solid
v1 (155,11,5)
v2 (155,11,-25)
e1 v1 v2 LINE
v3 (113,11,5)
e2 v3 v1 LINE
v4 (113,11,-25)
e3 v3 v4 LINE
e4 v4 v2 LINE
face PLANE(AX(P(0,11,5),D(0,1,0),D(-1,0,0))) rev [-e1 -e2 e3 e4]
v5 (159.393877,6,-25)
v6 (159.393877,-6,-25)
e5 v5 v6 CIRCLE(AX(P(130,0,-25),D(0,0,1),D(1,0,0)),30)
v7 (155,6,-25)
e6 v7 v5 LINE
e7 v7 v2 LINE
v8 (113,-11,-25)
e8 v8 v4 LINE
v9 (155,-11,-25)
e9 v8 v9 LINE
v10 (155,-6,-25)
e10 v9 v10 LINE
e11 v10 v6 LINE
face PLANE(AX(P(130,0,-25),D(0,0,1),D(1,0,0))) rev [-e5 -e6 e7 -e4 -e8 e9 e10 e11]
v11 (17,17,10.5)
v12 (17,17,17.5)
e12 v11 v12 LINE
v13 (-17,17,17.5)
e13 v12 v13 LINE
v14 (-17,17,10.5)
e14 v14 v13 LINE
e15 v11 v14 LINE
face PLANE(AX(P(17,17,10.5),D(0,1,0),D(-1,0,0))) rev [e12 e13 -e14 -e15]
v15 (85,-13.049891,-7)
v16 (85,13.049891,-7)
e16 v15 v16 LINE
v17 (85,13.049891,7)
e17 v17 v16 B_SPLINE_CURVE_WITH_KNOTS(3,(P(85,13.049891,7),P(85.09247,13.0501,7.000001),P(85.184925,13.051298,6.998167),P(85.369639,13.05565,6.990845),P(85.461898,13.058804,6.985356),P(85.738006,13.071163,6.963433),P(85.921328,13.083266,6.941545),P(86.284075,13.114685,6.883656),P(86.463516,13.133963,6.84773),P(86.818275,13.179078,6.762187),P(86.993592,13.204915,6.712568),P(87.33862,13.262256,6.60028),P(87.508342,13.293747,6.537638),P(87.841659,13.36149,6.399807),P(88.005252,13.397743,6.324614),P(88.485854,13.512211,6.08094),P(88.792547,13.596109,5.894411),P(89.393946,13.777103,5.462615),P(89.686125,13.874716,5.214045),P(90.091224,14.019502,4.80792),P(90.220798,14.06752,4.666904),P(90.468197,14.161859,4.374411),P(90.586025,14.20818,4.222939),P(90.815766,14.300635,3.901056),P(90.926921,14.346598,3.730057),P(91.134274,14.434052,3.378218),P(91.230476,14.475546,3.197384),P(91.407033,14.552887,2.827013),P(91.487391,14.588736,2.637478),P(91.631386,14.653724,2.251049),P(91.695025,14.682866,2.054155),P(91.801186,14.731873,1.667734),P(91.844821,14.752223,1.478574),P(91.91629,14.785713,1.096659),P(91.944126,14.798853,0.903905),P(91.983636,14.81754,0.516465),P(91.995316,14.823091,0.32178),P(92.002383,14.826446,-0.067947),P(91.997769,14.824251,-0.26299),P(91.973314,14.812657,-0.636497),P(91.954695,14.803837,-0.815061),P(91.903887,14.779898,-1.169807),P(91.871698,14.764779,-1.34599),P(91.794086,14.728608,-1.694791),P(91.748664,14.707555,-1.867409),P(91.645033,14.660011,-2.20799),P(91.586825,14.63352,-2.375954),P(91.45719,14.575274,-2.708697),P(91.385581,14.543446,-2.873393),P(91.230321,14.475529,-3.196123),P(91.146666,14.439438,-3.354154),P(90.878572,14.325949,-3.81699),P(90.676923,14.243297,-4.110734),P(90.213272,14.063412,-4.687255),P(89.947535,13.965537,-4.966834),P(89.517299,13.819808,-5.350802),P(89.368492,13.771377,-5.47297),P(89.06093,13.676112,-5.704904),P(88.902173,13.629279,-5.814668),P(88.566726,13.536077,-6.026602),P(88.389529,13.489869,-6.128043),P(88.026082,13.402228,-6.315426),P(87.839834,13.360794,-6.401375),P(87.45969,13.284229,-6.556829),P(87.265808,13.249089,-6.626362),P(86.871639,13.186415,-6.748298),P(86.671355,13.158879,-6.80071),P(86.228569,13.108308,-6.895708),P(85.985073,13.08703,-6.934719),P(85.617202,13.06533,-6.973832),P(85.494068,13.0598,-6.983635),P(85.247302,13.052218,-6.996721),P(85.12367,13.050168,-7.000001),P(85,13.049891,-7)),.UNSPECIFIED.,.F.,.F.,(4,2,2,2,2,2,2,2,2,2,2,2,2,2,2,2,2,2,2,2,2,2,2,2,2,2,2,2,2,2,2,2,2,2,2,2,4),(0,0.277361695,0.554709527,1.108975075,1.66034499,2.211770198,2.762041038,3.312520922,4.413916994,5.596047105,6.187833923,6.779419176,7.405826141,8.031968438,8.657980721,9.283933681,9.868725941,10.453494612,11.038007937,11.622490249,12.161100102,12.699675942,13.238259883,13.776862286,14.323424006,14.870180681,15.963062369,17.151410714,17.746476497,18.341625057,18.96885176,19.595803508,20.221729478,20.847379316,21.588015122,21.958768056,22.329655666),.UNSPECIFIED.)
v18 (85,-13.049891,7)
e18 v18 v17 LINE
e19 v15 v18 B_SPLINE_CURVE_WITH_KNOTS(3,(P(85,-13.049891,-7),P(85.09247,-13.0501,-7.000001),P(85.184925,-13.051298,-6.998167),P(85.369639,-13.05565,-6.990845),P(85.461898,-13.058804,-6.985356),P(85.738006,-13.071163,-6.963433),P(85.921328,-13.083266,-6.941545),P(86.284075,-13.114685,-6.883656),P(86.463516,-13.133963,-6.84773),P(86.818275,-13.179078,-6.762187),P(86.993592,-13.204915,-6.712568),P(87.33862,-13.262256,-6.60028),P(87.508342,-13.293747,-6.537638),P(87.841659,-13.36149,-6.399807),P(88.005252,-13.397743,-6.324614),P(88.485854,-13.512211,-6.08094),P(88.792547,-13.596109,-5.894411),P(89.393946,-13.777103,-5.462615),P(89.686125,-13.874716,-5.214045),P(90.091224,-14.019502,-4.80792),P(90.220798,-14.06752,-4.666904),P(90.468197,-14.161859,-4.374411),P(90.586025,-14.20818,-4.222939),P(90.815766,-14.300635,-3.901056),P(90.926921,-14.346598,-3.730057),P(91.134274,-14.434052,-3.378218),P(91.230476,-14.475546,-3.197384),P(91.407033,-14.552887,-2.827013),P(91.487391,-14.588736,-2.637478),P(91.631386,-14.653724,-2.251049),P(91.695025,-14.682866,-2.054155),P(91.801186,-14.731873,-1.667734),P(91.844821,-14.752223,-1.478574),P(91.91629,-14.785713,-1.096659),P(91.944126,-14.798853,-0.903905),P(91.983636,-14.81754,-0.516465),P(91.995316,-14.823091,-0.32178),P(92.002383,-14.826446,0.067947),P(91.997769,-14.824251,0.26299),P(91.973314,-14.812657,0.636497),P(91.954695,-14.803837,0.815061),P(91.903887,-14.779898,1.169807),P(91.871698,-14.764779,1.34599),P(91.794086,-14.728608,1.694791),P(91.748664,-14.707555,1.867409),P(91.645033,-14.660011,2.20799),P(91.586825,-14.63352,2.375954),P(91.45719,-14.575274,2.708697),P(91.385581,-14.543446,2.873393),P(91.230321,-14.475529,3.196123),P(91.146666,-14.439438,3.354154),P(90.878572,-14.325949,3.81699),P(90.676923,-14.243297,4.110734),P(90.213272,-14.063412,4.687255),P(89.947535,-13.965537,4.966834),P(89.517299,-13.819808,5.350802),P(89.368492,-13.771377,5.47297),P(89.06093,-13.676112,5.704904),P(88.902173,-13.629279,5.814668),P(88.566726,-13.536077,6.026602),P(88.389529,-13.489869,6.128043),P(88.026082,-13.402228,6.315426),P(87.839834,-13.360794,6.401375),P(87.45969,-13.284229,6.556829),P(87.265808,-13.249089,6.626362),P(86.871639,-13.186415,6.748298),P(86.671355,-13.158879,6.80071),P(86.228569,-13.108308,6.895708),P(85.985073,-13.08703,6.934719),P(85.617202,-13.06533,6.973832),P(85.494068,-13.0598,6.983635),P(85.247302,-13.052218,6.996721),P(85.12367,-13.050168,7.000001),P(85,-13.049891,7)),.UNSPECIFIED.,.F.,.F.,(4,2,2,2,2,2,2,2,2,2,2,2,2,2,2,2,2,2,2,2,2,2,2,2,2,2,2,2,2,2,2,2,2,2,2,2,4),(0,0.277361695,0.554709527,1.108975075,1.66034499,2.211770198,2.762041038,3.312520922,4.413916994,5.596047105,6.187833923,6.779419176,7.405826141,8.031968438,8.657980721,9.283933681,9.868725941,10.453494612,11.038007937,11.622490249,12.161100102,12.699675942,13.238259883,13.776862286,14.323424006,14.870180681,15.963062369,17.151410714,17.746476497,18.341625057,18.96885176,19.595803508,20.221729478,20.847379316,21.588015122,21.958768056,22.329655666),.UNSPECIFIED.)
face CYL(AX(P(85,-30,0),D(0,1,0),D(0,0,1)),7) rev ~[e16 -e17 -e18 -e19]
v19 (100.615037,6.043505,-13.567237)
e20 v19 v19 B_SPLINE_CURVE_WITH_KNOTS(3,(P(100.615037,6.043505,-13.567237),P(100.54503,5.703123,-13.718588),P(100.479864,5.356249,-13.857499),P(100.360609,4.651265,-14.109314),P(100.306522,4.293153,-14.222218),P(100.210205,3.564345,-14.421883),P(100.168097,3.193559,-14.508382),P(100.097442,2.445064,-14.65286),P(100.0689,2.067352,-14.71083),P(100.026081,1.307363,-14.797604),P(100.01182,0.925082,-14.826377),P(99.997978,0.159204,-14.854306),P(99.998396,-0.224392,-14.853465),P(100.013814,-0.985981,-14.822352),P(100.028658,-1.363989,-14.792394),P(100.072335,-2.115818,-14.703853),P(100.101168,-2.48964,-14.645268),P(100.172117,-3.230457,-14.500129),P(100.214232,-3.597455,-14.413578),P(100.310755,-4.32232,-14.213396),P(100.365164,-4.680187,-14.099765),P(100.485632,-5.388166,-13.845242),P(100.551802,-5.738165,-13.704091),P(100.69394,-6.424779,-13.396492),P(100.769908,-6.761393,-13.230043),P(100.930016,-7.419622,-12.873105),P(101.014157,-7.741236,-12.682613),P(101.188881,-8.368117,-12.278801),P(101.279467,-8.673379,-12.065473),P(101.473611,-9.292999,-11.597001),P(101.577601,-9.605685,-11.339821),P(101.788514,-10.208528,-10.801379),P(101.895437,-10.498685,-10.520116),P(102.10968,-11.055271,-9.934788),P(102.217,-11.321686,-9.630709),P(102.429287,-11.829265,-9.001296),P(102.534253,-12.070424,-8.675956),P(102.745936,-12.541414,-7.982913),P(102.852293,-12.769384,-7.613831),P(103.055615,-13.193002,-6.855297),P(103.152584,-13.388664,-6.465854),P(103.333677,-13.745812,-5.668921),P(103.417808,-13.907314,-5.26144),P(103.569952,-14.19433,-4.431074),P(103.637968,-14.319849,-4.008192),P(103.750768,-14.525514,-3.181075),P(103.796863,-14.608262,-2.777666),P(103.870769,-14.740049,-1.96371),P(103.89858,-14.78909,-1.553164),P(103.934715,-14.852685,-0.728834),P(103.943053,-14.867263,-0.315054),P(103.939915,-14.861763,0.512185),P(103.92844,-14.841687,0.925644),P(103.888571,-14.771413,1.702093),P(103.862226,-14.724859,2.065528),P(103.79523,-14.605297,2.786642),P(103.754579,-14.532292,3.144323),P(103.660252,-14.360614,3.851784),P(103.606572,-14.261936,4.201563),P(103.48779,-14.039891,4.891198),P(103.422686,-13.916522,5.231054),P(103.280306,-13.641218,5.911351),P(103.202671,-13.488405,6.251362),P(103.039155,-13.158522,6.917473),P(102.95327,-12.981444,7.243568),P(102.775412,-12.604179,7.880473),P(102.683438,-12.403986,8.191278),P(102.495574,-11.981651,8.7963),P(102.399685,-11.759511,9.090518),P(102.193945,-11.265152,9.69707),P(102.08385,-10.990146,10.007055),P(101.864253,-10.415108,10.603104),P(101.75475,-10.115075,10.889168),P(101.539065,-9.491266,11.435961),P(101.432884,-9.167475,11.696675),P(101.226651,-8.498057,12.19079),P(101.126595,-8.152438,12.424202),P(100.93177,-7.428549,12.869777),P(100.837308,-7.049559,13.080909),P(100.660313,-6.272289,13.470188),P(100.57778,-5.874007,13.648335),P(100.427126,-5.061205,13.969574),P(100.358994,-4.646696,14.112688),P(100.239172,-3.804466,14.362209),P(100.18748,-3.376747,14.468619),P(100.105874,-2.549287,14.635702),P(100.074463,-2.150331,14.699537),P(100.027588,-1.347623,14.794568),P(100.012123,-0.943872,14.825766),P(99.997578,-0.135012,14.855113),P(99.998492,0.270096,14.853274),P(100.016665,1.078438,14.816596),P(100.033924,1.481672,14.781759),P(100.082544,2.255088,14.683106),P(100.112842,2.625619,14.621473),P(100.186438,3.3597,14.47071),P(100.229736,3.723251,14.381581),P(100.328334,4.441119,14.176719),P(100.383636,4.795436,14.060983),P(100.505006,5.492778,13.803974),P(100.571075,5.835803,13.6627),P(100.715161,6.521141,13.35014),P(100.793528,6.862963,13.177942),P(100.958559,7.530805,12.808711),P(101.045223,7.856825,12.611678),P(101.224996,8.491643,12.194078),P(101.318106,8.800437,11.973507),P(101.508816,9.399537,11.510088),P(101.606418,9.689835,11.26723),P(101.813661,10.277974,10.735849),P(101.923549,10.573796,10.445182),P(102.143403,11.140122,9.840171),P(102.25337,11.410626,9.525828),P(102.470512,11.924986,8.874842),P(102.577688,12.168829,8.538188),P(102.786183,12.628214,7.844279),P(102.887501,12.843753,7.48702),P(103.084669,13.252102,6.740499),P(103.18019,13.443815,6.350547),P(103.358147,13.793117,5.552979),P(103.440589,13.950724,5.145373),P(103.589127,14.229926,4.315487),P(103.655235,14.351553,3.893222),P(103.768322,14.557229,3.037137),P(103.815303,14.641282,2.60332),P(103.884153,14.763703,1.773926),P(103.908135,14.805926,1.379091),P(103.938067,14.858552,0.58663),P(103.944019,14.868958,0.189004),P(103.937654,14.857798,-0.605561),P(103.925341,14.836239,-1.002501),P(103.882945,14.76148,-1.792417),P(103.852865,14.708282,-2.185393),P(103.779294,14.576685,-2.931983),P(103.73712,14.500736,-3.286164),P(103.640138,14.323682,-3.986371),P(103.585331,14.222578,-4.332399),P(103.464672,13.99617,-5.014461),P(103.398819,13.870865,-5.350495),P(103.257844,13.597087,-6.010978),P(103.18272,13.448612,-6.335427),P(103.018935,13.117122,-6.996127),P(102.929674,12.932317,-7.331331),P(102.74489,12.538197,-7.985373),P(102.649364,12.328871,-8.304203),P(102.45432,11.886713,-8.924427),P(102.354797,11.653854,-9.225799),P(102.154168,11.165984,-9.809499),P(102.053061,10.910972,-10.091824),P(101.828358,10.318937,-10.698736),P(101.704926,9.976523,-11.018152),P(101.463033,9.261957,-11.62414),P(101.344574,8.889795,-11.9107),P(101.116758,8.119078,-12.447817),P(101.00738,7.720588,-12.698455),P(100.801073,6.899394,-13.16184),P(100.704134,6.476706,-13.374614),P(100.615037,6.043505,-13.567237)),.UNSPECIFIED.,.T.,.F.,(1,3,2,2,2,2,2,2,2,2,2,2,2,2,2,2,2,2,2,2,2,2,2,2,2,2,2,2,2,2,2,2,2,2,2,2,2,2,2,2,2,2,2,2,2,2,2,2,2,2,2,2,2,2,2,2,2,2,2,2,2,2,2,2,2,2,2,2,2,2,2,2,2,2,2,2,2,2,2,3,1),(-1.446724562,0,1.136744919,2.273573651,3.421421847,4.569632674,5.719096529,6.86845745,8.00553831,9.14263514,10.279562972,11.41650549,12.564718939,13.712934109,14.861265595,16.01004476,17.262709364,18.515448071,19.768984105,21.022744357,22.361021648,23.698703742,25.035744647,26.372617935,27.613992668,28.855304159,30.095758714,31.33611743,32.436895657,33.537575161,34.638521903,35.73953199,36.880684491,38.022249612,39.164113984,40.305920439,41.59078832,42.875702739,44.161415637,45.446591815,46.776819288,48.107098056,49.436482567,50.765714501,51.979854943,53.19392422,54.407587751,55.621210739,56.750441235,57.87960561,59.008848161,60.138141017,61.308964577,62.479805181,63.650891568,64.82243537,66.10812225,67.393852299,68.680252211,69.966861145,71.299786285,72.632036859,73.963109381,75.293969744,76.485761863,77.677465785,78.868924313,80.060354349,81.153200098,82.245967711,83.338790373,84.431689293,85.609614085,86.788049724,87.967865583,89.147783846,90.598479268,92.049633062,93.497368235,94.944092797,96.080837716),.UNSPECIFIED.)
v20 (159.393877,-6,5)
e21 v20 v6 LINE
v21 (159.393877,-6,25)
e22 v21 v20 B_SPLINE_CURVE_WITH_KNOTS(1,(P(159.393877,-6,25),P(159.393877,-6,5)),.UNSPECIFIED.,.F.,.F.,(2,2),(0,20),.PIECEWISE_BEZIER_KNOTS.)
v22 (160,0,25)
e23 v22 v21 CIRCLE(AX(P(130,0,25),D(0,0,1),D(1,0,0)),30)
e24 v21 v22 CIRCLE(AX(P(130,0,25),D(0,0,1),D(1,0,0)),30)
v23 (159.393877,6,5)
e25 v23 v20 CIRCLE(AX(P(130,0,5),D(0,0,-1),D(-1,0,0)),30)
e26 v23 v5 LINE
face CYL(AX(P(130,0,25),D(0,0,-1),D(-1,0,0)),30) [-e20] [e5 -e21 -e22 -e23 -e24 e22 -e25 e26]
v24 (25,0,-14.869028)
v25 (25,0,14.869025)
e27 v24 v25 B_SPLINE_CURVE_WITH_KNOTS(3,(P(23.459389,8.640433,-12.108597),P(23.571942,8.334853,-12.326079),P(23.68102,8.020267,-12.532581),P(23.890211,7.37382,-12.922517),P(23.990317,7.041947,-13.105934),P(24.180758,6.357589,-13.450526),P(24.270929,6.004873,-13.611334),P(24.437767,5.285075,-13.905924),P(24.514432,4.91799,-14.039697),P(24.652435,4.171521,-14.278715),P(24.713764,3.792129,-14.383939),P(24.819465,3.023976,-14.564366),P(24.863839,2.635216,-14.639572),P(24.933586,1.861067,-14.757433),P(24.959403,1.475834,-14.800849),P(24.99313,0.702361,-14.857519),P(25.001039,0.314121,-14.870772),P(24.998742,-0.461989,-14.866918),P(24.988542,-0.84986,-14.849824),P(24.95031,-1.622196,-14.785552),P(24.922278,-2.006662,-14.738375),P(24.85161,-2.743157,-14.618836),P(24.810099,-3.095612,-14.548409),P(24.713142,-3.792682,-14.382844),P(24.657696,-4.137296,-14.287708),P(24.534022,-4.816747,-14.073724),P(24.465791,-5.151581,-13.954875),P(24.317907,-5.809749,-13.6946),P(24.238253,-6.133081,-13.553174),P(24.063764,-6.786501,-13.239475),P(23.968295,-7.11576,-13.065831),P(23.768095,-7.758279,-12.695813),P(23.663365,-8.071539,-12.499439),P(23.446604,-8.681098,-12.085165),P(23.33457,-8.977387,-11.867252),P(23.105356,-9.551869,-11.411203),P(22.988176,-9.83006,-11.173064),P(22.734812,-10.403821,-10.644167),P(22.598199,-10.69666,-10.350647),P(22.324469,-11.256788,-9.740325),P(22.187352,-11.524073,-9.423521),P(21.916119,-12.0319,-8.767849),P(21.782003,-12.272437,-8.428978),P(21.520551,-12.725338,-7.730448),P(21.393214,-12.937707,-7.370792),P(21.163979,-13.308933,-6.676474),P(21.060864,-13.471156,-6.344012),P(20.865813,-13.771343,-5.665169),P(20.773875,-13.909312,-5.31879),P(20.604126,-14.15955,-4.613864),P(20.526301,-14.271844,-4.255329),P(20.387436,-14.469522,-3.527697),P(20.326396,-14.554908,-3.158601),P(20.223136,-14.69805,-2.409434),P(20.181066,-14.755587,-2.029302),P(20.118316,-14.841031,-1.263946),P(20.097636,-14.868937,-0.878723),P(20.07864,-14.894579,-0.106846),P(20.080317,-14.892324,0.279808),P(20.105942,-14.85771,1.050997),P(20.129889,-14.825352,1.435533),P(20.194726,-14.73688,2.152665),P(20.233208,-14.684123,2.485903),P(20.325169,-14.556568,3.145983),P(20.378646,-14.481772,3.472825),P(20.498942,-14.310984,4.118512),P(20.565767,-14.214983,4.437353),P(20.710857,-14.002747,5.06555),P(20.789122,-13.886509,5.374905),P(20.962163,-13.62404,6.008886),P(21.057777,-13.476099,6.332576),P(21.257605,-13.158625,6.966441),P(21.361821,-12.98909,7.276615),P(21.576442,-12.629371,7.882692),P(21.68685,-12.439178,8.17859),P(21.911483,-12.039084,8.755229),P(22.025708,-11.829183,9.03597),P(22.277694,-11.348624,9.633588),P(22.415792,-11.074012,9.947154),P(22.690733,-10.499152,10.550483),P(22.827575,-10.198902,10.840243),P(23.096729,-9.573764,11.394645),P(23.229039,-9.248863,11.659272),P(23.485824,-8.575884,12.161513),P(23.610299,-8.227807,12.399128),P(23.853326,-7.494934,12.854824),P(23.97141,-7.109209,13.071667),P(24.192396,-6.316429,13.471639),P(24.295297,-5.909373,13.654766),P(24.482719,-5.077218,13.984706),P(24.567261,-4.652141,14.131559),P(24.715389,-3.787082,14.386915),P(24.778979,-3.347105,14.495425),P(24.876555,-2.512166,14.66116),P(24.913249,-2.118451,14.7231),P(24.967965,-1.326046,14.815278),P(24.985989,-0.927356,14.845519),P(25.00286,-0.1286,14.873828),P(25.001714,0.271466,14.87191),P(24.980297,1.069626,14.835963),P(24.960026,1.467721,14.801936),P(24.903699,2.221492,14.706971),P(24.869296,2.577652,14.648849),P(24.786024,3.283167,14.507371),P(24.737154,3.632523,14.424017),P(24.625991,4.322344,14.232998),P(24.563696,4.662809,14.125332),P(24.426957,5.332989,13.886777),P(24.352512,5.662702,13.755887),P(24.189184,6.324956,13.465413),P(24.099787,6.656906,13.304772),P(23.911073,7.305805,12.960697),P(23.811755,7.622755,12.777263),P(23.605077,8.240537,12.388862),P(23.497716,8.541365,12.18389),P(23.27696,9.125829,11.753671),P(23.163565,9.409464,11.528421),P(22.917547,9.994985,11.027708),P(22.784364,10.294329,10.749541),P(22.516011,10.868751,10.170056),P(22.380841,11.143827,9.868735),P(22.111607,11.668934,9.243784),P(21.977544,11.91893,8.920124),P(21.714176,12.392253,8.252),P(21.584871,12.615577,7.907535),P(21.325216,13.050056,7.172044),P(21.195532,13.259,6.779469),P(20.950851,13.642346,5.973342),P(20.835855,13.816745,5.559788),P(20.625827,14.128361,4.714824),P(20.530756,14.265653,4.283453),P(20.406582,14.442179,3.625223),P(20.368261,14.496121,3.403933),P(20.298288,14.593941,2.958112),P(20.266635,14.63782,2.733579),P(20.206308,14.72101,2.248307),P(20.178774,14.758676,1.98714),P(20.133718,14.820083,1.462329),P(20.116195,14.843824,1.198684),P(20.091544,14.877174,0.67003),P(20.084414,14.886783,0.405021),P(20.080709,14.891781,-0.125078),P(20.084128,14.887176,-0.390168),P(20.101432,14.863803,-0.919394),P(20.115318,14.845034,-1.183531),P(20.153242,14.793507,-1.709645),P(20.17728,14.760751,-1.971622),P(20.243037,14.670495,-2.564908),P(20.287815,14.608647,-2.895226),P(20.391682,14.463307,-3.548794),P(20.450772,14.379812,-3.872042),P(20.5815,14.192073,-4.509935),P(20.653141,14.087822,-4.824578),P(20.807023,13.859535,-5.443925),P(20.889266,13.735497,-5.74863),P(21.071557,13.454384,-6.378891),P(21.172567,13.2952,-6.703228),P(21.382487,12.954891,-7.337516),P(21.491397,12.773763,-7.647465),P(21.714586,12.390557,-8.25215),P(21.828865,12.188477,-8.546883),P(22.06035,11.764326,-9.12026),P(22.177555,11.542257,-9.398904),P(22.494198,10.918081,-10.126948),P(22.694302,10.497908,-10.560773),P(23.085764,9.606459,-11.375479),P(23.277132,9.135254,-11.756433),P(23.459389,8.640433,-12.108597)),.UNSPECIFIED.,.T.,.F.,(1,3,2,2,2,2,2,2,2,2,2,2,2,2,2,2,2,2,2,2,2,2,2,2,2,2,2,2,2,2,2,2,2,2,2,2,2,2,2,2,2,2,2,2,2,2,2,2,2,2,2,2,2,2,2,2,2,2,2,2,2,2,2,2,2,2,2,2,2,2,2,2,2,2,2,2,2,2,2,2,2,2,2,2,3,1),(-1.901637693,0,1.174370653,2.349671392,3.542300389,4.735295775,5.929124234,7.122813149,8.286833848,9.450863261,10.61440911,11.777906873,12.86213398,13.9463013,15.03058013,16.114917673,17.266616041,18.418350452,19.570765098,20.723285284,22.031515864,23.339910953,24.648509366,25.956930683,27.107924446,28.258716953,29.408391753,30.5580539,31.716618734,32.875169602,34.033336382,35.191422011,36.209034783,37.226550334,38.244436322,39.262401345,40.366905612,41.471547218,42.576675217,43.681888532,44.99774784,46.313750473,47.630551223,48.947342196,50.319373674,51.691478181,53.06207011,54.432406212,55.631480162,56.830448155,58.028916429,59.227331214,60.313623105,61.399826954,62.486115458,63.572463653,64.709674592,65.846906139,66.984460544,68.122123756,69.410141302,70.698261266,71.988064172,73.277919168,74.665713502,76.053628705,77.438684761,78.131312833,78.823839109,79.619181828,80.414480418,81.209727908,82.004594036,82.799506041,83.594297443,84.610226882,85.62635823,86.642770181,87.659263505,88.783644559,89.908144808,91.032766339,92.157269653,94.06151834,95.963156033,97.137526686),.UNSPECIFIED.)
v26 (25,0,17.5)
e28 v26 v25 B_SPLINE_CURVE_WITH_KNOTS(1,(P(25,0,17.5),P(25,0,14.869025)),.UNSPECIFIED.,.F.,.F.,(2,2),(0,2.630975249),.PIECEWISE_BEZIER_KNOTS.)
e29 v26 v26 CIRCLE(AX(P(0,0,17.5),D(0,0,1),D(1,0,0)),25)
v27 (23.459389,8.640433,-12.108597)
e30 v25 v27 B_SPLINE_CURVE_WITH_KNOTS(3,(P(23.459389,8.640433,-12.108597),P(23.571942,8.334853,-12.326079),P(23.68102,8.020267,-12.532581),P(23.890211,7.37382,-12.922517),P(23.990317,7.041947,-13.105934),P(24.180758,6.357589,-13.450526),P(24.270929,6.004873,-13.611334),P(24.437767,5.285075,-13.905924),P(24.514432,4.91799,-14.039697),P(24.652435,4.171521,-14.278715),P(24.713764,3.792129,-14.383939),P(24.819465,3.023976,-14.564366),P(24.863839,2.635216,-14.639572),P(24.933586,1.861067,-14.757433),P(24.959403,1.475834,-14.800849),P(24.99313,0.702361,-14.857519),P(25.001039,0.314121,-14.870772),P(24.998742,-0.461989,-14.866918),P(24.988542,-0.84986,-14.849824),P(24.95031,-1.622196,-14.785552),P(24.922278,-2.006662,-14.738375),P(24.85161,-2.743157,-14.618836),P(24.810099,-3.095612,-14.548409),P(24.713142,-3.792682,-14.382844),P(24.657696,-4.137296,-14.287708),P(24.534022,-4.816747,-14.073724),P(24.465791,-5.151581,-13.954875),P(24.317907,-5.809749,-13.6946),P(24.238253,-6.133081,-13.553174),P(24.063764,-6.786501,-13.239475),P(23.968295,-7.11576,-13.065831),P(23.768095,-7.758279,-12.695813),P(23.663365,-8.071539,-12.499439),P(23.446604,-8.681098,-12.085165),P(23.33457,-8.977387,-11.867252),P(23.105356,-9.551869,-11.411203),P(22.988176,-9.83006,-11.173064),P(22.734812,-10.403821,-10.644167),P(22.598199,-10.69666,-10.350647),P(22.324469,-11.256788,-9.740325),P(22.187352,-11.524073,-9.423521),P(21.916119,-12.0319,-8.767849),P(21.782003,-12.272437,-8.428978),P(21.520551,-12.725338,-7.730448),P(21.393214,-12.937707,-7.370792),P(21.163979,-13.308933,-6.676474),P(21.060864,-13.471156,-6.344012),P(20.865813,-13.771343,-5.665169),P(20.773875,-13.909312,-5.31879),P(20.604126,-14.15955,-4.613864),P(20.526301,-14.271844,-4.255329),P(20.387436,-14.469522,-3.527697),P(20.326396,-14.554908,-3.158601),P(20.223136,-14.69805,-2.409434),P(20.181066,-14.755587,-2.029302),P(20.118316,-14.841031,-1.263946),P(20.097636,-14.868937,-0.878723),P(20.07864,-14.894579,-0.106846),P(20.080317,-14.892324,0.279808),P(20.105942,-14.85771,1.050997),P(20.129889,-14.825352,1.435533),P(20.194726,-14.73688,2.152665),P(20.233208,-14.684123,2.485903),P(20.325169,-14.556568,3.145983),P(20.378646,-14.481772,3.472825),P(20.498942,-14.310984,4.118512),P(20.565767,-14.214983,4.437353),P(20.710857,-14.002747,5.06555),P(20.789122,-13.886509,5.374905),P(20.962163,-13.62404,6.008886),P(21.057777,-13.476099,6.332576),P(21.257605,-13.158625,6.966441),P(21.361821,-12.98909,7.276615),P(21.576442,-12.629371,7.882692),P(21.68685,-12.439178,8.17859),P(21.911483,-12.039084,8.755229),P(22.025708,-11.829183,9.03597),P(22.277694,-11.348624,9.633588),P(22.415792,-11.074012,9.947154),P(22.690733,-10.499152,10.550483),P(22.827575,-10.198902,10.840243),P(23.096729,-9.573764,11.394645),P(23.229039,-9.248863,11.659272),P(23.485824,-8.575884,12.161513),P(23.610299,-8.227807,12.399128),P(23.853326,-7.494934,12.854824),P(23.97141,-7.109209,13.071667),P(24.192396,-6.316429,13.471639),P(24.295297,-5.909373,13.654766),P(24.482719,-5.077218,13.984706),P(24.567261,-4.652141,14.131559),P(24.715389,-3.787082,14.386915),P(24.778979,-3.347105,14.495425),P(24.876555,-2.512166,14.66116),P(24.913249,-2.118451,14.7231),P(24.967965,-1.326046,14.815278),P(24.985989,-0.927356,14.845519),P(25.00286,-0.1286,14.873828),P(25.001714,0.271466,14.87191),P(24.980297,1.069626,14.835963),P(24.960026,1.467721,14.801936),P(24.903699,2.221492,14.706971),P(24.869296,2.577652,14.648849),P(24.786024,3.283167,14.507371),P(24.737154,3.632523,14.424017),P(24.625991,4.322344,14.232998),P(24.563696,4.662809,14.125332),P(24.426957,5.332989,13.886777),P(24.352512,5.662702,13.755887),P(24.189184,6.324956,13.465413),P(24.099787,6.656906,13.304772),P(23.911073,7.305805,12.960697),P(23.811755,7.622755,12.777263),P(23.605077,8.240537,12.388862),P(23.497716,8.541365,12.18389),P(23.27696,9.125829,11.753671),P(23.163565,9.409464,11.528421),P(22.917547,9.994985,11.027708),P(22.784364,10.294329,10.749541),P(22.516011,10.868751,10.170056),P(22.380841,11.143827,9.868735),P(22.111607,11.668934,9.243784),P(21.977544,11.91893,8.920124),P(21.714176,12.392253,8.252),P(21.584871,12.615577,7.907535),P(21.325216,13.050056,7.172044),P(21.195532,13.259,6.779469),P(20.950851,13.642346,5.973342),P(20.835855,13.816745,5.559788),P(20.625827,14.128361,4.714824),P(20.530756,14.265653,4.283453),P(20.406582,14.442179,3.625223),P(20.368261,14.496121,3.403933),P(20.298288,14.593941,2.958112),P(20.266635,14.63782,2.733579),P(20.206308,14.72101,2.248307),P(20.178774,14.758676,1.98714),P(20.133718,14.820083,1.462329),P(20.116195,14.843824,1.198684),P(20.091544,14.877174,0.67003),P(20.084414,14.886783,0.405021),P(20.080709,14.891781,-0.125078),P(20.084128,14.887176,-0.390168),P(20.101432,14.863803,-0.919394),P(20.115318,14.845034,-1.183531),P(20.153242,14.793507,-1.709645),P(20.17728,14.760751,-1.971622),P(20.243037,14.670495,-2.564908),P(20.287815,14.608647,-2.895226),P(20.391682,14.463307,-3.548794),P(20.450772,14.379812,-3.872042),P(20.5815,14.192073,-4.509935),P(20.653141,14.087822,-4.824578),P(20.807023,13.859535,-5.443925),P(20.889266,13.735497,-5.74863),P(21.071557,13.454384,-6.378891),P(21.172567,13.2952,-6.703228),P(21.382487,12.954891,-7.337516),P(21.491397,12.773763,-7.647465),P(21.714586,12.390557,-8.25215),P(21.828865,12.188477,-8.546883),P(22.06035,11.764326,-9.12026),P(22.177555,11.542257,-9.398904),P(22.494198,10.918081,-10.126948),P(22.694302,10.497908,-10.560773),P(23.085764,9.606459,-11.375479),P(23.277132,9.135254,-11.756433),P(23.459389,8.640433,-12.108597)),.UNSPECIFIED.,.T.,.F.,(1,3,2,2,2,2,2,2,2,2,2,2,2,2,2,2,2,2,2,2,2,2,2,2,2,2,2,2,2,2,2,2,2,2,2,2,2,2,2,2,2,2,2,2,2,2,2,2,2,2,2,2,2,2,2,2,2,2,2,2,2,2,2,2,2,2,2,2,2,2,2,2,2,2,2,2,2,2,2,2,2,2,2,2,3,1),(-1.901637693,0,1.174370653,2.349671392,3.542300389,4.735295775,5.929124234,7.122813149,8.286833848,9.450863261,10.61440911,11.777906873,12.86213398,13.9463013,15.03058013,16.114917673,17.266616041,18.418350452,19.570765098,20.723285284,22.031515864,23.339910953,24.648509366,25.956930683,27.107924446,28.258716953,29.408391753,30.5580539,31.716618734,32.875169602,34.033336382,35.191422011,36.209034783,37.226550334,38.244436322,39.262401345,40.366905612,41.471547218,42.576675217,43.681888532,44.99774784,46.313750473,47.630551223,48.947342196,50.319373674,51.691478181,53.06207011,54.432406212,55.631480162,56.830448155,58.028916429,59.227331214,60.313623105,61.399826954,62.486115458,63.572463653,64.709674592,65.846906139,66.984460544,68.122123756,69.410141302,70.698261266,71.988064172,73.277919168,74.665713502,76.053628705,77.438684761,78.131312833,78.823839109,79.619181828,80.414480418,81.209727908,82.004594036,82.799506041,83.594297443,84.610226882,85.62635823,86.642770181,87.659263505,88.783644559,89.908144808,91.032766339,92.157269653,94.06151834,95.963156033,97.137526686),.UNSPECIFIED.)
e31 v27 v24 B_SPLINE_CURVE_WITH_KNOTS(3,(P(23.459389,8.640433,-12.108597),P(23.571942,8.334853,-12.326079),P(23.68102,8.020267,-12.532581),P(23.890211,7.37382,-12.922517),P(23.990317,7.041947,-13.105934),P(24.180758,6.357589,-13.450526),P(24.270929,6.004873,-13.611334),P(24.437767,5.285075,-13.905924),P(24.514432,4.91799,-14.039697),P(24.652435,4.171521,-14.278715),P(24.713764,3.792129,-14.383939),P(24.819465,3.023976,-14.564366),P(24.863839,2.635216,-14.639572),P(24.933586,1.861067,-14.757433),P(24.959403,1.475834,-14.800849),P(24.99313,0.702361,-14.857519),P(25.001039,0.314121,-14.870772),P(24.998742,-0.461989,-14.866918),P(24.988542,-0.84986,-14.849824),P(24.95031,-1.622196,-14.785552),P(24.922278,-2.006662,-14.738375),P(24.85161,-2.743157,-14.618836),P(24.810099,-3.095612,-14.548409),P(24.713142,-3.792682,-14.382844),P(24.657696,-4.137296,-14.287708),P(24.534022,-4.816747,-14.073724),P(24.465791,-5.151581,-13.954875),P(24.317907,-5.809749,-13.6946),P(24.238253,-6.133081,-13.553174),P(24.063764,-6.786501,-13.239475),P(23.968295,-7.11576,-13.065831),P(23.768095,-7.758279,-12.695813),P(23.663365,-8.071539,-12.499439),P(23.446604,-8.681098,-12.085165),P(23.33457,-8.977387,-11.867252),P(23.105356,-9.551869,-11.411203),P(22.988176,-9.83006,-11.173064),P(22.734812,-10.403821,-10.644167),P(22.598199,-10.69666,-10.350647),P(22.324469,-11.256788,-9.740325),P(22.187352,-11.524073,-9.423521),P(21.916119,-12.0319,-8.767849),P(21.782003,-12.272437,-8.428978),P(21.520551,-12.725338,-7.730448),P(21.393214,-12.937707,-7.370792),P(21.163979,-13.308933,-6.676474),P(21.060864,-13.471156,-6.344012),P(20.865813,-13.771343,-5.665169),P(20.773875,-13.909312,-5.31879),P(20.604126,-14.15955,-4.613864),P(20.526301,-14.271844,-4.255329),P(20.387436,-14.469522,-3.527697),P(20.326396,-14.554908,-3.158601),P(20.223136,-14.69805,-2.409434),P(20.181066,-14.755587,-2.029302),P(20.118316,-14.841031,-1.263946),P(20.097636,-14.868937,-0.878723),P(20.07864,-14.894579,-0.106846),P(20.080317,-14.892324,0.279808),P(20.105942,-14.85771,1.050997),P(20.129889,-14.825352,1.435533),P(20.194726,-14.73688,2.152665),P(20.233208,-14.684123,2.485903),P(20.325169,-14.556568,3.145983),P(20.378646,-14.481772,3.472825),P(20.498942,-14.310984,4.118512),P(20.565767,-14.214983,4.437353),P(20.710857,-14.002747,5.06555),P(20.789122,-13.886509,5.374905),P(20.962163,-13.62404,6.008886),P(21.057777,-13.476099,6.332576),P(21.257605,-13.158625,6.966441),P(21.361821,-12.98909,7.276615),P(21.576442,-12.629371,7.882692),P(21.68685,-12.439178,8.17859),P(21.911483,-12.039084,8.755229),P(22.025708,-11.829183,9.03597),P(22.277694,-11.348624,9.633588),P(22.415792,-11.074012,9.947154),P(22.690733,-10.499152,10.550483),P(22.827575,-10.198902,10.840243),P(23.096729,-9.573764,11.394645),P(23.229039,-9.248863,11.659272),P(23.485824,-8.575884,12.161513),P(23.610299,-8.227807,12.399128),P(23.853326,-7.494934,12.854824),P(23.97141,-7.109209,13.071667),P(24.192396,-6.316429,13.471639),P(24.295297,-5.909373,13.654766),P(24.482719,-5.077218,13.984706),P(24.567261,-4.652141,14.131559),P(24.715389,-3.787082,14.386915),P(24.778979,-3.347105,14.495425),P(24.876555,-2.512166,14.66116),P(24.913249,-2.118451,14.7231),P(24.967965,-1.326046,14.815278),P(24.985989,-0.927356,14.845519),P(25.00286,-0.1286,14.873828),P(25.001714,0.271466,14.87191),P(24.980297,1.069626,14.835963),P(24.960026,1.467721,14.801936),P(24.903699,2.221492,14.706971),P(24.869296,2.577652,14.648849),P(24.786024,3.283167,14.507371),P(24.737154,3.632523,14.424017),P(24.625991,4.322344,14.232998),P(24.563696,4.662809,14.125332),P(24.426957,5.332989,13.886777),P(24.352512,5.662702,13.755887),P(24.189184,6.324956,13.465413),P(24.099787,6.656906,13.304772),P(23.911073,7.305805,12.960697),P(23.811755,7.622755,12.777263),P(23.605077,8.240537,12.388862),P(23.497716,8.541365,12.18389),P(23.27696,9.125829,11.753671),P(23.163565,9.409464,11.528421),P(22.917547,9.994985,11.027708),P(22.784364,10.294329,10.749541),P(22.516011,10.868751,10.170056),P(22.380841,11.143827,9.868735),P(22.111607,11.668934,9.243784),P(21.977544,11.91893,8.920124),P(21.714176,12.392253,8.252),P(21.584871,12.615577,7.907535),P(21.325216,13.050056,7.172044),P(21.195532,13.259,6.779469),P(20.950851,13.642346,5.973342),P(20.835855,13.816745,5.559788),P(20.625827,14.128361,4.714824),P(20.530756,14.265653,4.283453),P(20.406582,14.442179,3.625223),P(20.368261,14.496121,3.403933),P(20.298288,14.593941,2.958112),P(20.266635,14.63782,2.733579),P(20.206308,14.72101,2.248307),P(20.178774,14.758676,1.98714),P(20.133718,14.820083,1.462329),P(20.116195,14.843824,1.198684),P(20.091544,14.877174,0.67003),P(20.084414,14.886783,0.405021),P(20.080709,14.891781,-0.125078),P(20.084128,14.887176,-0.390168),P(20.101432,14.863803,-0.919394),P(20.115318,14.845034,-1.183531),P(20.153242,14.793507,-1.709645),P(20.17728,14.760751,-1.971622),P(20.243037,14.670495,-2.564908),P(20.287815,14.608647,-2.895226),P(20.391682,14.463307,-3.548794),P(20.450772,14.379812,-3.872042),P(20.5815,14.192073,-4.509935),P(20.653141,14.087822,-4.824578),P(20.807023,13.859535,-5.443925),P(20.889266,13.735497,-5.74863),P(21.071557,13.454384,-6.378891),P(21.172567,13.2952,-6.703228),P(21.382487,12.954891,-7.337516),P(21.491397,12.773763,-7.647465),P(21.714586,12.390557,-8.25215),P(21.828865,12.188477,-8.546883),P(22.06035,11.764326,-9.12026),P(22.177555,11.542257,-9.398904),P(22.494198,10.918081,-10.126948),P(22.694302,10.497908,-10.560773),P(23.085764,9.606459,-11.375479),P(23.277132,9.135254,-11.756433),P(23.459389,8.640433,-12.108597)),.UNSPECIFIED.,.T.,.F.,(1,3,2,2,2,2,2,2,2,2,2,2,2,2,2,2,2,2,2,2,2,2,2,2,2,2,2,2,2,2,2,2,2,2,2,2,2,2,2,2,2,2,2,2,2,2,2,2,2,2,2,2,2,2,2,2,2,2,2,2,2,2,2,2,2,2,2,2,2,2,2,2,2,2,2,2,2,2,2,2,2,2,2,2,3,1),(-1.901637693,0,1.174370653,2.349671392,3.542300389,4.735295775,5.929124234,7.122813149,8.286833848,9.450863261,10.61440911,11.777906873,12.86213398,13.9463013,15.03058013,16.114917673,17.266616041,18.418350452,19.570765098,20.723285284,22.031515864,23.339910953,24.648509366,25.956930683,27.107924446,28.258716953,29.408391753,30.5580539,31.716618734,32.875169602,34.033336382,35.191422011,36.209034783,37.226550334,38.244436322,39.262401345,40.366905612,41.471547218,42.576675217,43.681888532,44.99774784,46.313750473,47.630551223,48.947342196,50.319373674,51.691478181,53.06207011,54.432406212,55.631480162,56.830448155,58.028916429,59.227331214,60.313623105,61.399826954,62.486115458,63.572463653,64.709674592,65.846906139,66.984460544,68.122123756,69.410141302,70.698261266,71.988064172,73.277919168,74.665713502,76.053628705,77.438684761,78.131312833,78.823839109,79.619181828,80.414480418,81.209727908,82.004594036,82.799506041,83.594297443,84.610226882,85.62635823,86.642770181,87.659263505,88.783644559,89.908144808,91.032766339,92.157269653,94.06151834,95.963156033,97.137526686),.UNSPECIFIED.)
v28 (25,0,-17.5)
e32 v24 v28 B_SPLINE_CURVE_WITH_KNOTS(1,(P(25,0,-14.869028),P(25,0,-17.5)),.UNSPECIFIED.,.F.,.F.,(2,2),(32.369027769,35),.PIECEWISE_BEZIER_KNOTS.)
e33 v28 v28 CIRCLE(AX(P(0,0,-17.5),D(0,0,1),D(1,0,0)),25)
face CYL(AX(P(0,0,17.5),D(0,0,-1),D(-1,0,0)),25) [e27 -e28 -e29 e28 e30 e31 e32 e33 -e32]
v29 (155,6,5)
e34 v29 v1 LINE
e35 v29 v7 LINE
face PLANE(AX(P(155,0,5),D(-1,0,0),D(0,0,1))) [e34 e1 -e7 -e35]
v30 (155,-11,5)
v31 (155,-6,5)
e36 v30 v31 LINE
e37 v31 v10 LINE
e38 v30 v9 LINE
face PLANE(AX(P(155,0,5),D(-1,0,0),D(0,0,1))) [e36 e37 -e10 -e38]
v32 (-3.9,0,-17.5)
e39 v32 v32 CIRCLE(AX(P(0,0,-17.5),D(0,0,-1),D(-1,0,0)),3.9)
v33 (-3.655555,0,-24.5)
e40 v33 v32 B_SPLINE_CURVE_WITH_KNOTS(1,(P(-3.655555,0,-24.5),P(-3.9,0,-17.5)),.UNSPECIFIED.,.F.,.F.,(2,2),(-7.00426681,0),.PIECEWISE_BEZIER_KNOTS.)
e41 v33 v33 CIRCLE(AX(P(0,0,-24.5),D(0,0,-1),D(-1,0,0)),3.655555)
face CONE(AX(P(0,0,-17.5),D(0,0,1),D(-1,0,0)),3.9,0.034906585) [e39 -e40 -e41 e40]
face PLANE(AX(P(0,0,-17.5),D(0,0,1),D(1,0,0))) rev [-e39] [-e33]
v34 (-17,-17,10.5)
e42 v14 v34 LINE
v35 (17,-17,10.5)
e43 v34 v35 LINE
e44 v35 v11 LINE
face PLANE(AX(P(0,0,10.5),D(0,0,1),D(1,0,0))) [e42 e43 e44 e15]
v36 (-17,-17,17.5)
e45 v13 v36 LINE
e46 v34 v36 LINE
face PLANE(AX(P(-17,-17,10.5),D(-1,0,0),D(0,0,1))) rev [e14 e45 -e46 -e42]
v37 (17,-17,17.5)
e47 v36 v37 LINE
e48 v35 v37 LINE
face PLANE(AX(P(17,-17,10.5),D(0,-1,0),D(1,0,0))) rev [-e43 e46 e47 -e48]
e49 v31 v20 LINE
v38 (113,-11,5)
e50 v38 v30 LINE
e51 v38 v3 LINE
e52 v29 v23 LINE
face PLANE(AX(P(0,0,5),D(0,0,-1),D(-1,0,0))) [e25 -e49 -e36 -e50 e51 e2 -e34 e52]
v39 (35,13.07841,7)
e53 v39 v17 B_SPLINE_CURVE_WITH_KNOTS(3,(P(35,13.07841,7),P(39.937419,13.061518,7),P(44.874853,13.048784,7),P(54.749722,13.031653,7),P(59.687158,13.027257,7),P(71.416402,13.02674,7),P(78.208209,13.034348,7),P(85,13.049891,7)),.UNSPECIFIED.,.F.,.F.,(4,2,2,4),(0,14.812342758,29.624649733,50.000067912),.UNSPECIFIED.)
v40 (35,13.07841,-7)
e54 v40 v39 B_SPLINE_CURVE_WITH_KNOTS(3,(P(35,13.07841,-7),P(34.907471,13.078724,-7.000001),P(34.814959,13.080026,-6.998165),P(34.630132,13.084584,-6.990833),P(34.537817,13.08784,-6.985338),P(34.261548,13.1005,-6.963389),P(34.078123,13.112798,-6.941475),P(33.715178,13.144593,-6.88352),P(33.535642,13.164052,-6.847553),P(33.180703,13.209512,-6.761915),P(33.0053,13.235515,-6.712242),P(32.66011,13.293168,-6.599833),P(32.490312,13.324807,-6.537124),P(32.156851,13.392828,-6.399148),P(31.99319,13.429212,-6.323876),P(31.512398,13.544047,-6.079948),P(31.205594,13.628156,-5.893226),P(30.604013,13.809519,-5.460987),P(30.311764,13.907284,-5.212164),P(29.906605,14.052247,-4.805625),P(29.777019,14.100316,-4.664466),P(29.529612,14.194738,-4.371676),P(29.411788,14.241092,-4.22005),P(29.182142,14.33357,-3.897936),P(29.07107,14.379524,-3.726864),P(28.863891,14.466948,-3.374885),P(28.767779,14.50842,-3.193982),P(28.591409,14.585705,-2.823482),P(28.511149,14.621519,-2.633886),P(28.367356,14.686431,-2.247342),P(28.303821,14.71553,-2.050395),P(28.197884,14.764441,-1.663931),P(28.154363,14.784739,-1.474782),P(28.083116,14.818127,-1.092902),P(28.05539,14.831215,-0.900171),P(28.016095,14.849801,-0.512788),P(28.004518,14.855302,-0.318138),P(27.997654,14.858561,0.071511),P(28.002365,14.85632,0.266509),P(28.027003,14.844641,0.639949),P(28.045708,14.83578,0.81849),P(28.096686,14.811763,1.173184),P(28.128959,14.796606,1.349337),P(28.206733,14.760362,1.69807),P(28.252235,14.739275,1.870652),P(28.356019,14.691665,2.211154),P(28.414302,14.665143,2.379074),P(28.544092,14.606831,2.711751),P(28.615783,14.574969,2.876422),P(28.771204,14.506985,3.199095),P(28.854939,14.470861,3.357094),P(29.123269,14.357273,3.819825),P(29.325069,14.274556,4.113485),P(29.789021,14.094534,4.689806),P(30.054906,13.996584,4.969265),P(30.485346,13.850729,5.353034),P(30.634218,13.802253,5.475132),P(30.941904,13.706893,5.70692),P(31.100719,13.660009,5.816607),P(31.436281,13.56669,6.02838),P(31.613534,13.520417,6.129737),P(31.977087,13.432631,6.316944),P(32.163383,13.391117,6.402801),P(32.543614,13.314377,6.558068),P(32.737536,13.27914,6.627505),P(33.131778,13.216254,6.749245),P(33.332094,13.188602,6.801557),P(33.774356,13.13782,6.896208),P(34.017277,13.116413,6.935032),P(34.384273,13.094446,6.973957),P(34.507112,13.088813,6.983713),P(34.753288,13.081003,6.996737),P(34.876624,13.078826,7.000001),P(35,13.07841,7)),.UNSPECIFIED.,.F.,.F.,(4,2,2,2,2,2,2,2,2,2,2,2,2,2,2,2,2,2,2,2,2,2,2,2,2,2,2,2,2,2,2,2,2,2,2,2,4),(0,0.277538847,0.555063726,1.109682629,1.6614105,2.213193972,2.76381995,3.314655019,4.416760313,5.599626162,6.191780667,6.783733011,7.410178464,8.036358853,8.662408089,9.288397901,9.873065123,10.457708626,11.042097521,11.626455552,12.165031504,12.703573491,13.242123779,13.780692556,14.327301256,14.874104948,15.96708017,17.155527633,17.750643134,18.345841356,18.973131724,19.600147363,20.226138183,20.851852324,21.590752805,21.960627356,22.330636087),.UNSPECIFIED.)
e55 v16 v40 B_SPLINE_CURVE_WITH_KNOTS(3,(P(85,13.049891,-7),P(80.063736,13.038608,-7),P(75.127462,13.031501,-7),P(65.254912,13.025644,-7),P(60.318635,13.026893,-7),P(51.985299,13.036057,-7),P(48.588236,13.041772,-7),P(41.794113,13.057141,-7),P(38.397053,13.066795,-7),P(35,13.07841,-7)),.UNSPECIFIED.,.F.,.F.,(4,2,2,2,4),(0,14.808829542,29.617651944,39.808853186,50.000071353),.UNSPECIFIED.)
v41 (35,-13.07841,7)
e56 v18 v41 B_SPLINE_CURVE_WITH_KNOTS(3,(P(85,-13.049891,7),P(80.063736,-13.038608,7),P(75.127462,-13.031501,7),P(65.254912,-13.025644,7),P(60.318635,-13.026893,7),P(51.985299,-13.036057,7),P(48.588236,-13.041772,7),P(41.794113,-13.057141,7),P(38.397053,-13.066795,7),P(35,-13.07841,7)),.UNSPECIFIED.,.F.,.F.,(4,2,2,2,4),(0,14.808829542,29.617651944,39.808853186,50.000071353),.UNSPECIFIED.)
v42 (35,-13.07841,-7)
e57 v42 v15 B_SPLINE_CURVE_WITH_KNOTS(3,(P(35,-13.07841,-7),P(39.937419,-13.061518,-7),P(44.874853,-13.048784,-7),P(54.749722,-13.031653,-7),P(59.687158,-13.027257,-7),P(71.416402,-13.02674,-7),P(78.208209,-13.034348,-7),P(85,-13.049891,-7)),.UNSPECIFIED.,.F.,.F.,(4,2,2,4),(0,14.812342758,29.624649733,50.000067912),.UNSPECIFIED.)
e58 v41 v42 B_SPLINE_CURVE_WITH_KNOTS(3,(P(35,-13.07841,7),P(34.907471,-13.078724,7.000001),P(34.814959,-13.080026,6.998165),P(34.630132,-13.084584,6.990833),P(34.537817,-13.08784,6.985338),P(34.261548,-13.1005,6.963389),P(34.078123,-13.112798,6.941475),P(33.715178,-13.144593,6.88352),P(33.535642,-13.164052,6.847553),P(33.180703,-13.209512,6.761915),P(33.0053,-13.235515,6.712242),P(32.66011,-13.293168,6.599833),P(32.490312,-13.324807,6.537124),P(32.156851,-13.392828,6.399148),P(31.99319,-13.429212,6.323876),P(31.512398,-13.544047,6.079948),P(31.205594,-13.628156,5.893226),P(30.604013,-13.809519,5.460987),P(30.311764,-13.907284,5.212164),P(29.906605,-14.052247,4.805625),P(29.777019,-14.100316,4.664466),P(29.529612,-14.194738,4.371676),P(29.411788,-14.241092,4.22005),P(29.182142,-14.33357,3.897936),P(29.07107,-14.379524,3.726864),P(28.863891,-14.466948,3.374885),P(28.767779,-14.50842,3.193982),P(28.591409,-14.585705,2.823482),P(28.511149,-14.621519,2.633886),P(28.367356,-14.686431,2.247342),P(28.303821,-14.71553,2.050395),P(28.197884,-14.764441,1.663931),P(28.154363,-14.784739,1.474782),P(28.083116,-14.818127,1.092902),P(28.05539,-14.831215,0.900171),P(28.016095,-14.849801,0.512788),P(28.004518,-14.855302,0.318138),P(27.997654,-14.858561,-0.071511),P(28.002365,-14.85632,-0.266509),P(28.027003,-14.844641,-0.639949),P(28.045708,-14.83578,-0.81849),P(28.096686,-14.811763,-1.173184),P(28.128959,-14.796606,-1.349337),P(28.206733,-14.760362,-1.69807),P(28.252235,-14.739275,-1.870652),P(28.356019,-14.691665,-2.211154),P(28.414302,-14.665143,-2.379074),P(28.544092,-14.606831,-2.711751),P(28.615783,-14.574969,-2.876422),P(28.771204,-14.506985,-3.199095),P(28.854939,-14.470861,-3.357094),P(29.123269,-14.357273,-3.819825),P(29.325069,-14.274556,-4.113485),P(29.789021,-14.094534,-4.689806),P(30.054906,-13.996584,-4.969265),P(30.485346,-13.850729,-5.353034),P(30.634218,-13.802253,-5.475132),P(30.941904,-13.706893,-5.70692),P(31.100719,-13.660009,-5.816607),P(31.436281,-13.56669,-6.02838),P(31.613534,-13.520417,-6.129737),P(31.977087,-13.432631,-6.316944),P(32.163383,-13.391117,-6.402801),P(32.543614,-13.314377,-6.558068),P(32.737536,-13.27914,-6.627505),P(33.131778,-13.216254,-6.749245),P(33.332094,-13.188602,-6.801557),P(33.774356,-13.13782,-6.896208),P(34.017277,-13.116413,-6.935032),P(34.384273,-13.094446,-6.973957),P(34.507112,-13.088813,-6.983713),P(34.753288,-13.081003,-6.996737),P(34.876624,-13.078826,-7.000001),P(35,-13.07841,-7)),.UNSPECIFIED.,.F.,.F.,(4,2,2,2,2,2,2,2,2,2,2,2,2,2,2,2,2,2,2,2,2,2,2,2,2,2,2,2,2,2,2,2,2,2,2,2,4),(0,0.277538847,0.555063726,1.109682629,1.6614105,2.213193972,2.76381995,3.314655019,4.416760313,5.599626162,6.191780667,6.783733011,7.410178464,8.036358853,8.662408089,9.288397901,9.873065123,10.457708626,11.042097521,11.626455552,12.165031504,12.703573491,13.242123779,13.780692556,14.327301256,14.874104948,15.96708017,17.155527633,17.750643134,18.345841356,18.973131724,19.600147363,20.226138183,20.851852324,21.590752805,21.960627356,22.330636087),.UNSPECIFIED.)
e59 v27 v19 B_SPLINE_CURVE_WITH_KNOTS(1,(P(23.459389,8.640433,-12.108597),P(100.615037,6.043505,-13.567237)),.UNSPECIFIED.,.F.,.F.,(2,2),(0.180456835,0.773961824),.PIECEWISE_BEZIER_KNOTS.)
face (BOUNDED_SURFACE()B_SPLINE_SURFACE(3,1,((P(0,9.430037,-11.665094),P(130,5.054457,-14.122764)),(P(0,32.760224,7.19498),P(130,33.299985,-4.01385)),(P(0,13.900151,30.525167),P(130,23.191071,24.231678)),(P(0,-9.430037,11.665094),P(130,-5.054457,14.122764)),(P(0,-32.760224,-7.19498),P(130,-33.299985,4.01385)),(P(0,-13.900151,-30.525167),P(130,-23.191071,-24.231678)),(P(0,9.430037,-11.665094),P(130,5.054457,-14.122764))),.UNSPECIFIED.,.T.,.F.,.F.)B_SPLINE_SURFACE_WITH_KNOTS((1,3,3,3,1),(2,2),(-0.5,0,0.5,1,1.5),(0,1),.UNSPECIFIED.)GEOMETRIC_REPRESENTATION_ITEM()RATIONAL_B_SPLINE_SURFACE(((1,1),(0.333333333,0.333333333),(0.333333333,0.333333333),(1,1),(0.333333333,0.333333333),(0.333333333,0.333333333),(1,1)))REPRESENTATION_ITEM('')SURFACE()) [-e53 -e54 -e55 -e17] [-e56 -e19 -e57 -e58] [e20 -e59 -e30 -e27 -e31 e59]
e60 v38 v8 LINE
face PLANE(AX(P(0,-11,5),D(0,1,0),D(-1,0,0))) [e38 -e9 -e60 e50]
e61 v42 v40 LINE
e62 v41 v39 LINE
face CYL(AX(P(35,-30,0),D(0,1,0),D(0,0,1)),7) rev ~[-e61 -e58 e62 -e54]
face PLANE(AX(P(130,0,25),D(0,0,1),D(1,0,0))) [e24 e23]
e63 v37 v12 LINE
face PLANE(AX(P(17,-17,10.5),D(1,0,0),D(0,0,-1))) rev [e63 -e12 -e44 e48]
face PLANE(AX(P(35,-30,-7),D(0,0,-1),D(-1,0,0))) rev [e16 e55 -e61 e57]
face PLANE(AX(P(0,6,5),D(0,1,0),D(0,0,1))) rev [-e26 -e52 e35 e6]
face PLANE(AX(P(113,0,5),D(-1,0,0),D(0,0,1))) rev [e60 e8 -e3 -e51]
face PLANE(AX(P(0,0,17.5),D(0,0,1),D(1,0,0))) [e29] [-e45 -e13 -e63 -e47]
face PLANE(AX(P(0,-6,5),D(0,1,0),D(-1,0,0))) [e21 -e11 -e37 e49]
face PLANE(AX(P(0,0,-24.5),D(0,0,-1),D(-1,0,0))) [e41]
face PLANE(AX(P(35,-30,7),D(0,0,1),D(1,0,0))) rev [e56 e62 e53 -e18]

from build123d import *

# Parameters (mm, degrees)
SKETCH1_R               = 25
BOSS_EXTRUDE1_DEPTH     = 17.5
SKETCH4_R               = 30
BOSS_EXTRUDE2_DEPTH     = 25
CUT_EXTRUDE1_DEPTH      = 165.696691051
CUT_EXTRUDE1_DEPTH_BACK = 165.696691051
SKETCH6_W               = 34
SKETCH6_H               = 34
CUT_EXTRUDE2_DEPTH      = 7
SKETCH7_R               = 3.9
BOSS_EXTRUDE3_DEPTH     = 7
BOSS_EXTRUDE3_TAPER     = 2
CUT_EXTRUDE3_START      = -30
SKETCH8_W               = 42
SKETCH8_H               = 22
CUT_EXTRUDE3_DEPTH      = 30


with BuildPart() as part:
    # Sketch1 → Boss-Extrude1 (new, symmetric)
    with BuildSketch(Plane.XY):
        Circle(SKETCH1_R)
    extrude(amount=BOSS_EXTRUDE1_DEPTH, both=True)

    # Loft1: read off the stored shape, not the designer's step
    # Loft1: loft between two sections, ruled curve by curve
    loft1_from = [
        Edge.make_bspline([(0, 9.43003665, -11.665093603), (0, 32.760223857, 7.194979697), (0, 13.900150557, 30.525166904), (0, -9.43003665, 11.665093603), (0, -32.760223857, -7.194979697), (0, -13.900150557, -30.525166904), (0, 9.43003665, -11.665093603)], [0, 0, 0, 0, 0.5, 0.5, 0.5, 1, 1, 1, 1], 3, [1, 0.333333333, 0.333333333, 1, 0.333333333, 0.333333333, 1]),
    ]
    loft1_to = [
        Edge.make_bspline([(130, 5.054457016, -14.122764045), (130, 33.299985106, -4.013850014), (130, 23.191071075, 24.231678077), (130, -5.054457016, 14.122764045), (130, -33.299985106, 4.013850014), (130, -23.191071075, -24.231678077), (130, 5.054457016, -14.122764045)], [0, 0, 0, 0, 0.5, 0.5, 0.5, 1, 1, 1, 1], 3, [1, 0.333333333, 0.333333333, 1, 0.333333333, 0.333333333, 1]),
    ]
    loft1 = Solid(Shell([*[Face.make_surface_from_curves(loft1_from[k], loft1_to[k]) for k in range(1)], Face(Wire(loft1_from)), Face(Wire(loft1_to))]))
    add(loft1)

    # Sketch4 → Boss-Extrude2 (add, symmetric)
    with BuildSketch(Plane.XY):
        with Locations((130, 0)):
            Circle(SKETCH4_R)
    extrude(amount=BOSS_EXTRUDE2_DEPTH, both=True)

    # Sketch5 → Cut-Extrude1 (cut, two sides: drawn at the far end of the back side and taken through both)
    with BuildSketch(Plane(origin=(0, 0, 0), x_dir=(1, 0, 0), z_dir=(0, 1, 0)).offset(-CUT_EXTRUDE1_DEPTH_BACK)):
        with BuildLine():
            Line((35, 7), (85, 7))
            ThreePointArc((85, 7), (92, 0), (85, -7))
            Line((85, -7), (35, -7))
            ThreePointArc((35, -7), (28, 0), (35, 7))
        make_face()
    extrude(amount=CUT_EXTRUDE1_DEPTH + CUT_EXTRUDE1_DEPTH_BACK, mode=Mode.SUBTRACT)

    # Sketch6 → Cut-Extrude2 (cut)
    with BuildSketch(Plane.XY.offset(17.5)):
        Rectangle(SKETCH6_W, SKETCH6_H)
    extrude(amount=-CUT_EXTRUDE2_DEPTH, mode=Mode.SUBTRACT)

    # Sketch7 → Boss-Extrude3 (add)
    with BuildSketch(Plane(origin=(0, 0, -17.5), x_dir=(-1, 0, 0), z_dir=(0, 0, -1))):
        Circle(SKETCH7_R)
    extrude(amount=BOSS_EXTRUDE3_DEPTH, taper=BOSS_EXTRUDE3_TAPER)

    # Sketch8 → Cut-Extrude3 (cut)
    with BuildSketch(Plane(origin=(0, 0, -25), x_dir=(-1, 0, 0), z_dir=(0, 0, -1)).offset(CUT_EXTRUDE3_START)):
        with Locations((-134, 0)):
            Rectangle(SKETCH8_W, SKETCH8_H)
        with BuildLine():
            Line((-165, -6), (-159.393876913, -6))
            ThreePointArc((-159.393876913, -6), (-160, 0), (-159.393876913, 6))
            Line((-159.393876913, 6), (-165, 6))
            Line((-165, 6), (-165, -6))
        make_face()
        with BuildLine():
            Line((-159.393876913, -6), (-155, -6))
            Line((-155, -6), (-155, 6))
            Line((-155, 6), (-159.393876913, 6))
            ThreePointArc((-159.393876913, 6), (-160, 0), (-159.393876913, -6))
        make_face()
    extrude(amount=CUT_EXTRUDE3_DEPTH, mode=Mode.SUBTRACT)


solid = part.part
